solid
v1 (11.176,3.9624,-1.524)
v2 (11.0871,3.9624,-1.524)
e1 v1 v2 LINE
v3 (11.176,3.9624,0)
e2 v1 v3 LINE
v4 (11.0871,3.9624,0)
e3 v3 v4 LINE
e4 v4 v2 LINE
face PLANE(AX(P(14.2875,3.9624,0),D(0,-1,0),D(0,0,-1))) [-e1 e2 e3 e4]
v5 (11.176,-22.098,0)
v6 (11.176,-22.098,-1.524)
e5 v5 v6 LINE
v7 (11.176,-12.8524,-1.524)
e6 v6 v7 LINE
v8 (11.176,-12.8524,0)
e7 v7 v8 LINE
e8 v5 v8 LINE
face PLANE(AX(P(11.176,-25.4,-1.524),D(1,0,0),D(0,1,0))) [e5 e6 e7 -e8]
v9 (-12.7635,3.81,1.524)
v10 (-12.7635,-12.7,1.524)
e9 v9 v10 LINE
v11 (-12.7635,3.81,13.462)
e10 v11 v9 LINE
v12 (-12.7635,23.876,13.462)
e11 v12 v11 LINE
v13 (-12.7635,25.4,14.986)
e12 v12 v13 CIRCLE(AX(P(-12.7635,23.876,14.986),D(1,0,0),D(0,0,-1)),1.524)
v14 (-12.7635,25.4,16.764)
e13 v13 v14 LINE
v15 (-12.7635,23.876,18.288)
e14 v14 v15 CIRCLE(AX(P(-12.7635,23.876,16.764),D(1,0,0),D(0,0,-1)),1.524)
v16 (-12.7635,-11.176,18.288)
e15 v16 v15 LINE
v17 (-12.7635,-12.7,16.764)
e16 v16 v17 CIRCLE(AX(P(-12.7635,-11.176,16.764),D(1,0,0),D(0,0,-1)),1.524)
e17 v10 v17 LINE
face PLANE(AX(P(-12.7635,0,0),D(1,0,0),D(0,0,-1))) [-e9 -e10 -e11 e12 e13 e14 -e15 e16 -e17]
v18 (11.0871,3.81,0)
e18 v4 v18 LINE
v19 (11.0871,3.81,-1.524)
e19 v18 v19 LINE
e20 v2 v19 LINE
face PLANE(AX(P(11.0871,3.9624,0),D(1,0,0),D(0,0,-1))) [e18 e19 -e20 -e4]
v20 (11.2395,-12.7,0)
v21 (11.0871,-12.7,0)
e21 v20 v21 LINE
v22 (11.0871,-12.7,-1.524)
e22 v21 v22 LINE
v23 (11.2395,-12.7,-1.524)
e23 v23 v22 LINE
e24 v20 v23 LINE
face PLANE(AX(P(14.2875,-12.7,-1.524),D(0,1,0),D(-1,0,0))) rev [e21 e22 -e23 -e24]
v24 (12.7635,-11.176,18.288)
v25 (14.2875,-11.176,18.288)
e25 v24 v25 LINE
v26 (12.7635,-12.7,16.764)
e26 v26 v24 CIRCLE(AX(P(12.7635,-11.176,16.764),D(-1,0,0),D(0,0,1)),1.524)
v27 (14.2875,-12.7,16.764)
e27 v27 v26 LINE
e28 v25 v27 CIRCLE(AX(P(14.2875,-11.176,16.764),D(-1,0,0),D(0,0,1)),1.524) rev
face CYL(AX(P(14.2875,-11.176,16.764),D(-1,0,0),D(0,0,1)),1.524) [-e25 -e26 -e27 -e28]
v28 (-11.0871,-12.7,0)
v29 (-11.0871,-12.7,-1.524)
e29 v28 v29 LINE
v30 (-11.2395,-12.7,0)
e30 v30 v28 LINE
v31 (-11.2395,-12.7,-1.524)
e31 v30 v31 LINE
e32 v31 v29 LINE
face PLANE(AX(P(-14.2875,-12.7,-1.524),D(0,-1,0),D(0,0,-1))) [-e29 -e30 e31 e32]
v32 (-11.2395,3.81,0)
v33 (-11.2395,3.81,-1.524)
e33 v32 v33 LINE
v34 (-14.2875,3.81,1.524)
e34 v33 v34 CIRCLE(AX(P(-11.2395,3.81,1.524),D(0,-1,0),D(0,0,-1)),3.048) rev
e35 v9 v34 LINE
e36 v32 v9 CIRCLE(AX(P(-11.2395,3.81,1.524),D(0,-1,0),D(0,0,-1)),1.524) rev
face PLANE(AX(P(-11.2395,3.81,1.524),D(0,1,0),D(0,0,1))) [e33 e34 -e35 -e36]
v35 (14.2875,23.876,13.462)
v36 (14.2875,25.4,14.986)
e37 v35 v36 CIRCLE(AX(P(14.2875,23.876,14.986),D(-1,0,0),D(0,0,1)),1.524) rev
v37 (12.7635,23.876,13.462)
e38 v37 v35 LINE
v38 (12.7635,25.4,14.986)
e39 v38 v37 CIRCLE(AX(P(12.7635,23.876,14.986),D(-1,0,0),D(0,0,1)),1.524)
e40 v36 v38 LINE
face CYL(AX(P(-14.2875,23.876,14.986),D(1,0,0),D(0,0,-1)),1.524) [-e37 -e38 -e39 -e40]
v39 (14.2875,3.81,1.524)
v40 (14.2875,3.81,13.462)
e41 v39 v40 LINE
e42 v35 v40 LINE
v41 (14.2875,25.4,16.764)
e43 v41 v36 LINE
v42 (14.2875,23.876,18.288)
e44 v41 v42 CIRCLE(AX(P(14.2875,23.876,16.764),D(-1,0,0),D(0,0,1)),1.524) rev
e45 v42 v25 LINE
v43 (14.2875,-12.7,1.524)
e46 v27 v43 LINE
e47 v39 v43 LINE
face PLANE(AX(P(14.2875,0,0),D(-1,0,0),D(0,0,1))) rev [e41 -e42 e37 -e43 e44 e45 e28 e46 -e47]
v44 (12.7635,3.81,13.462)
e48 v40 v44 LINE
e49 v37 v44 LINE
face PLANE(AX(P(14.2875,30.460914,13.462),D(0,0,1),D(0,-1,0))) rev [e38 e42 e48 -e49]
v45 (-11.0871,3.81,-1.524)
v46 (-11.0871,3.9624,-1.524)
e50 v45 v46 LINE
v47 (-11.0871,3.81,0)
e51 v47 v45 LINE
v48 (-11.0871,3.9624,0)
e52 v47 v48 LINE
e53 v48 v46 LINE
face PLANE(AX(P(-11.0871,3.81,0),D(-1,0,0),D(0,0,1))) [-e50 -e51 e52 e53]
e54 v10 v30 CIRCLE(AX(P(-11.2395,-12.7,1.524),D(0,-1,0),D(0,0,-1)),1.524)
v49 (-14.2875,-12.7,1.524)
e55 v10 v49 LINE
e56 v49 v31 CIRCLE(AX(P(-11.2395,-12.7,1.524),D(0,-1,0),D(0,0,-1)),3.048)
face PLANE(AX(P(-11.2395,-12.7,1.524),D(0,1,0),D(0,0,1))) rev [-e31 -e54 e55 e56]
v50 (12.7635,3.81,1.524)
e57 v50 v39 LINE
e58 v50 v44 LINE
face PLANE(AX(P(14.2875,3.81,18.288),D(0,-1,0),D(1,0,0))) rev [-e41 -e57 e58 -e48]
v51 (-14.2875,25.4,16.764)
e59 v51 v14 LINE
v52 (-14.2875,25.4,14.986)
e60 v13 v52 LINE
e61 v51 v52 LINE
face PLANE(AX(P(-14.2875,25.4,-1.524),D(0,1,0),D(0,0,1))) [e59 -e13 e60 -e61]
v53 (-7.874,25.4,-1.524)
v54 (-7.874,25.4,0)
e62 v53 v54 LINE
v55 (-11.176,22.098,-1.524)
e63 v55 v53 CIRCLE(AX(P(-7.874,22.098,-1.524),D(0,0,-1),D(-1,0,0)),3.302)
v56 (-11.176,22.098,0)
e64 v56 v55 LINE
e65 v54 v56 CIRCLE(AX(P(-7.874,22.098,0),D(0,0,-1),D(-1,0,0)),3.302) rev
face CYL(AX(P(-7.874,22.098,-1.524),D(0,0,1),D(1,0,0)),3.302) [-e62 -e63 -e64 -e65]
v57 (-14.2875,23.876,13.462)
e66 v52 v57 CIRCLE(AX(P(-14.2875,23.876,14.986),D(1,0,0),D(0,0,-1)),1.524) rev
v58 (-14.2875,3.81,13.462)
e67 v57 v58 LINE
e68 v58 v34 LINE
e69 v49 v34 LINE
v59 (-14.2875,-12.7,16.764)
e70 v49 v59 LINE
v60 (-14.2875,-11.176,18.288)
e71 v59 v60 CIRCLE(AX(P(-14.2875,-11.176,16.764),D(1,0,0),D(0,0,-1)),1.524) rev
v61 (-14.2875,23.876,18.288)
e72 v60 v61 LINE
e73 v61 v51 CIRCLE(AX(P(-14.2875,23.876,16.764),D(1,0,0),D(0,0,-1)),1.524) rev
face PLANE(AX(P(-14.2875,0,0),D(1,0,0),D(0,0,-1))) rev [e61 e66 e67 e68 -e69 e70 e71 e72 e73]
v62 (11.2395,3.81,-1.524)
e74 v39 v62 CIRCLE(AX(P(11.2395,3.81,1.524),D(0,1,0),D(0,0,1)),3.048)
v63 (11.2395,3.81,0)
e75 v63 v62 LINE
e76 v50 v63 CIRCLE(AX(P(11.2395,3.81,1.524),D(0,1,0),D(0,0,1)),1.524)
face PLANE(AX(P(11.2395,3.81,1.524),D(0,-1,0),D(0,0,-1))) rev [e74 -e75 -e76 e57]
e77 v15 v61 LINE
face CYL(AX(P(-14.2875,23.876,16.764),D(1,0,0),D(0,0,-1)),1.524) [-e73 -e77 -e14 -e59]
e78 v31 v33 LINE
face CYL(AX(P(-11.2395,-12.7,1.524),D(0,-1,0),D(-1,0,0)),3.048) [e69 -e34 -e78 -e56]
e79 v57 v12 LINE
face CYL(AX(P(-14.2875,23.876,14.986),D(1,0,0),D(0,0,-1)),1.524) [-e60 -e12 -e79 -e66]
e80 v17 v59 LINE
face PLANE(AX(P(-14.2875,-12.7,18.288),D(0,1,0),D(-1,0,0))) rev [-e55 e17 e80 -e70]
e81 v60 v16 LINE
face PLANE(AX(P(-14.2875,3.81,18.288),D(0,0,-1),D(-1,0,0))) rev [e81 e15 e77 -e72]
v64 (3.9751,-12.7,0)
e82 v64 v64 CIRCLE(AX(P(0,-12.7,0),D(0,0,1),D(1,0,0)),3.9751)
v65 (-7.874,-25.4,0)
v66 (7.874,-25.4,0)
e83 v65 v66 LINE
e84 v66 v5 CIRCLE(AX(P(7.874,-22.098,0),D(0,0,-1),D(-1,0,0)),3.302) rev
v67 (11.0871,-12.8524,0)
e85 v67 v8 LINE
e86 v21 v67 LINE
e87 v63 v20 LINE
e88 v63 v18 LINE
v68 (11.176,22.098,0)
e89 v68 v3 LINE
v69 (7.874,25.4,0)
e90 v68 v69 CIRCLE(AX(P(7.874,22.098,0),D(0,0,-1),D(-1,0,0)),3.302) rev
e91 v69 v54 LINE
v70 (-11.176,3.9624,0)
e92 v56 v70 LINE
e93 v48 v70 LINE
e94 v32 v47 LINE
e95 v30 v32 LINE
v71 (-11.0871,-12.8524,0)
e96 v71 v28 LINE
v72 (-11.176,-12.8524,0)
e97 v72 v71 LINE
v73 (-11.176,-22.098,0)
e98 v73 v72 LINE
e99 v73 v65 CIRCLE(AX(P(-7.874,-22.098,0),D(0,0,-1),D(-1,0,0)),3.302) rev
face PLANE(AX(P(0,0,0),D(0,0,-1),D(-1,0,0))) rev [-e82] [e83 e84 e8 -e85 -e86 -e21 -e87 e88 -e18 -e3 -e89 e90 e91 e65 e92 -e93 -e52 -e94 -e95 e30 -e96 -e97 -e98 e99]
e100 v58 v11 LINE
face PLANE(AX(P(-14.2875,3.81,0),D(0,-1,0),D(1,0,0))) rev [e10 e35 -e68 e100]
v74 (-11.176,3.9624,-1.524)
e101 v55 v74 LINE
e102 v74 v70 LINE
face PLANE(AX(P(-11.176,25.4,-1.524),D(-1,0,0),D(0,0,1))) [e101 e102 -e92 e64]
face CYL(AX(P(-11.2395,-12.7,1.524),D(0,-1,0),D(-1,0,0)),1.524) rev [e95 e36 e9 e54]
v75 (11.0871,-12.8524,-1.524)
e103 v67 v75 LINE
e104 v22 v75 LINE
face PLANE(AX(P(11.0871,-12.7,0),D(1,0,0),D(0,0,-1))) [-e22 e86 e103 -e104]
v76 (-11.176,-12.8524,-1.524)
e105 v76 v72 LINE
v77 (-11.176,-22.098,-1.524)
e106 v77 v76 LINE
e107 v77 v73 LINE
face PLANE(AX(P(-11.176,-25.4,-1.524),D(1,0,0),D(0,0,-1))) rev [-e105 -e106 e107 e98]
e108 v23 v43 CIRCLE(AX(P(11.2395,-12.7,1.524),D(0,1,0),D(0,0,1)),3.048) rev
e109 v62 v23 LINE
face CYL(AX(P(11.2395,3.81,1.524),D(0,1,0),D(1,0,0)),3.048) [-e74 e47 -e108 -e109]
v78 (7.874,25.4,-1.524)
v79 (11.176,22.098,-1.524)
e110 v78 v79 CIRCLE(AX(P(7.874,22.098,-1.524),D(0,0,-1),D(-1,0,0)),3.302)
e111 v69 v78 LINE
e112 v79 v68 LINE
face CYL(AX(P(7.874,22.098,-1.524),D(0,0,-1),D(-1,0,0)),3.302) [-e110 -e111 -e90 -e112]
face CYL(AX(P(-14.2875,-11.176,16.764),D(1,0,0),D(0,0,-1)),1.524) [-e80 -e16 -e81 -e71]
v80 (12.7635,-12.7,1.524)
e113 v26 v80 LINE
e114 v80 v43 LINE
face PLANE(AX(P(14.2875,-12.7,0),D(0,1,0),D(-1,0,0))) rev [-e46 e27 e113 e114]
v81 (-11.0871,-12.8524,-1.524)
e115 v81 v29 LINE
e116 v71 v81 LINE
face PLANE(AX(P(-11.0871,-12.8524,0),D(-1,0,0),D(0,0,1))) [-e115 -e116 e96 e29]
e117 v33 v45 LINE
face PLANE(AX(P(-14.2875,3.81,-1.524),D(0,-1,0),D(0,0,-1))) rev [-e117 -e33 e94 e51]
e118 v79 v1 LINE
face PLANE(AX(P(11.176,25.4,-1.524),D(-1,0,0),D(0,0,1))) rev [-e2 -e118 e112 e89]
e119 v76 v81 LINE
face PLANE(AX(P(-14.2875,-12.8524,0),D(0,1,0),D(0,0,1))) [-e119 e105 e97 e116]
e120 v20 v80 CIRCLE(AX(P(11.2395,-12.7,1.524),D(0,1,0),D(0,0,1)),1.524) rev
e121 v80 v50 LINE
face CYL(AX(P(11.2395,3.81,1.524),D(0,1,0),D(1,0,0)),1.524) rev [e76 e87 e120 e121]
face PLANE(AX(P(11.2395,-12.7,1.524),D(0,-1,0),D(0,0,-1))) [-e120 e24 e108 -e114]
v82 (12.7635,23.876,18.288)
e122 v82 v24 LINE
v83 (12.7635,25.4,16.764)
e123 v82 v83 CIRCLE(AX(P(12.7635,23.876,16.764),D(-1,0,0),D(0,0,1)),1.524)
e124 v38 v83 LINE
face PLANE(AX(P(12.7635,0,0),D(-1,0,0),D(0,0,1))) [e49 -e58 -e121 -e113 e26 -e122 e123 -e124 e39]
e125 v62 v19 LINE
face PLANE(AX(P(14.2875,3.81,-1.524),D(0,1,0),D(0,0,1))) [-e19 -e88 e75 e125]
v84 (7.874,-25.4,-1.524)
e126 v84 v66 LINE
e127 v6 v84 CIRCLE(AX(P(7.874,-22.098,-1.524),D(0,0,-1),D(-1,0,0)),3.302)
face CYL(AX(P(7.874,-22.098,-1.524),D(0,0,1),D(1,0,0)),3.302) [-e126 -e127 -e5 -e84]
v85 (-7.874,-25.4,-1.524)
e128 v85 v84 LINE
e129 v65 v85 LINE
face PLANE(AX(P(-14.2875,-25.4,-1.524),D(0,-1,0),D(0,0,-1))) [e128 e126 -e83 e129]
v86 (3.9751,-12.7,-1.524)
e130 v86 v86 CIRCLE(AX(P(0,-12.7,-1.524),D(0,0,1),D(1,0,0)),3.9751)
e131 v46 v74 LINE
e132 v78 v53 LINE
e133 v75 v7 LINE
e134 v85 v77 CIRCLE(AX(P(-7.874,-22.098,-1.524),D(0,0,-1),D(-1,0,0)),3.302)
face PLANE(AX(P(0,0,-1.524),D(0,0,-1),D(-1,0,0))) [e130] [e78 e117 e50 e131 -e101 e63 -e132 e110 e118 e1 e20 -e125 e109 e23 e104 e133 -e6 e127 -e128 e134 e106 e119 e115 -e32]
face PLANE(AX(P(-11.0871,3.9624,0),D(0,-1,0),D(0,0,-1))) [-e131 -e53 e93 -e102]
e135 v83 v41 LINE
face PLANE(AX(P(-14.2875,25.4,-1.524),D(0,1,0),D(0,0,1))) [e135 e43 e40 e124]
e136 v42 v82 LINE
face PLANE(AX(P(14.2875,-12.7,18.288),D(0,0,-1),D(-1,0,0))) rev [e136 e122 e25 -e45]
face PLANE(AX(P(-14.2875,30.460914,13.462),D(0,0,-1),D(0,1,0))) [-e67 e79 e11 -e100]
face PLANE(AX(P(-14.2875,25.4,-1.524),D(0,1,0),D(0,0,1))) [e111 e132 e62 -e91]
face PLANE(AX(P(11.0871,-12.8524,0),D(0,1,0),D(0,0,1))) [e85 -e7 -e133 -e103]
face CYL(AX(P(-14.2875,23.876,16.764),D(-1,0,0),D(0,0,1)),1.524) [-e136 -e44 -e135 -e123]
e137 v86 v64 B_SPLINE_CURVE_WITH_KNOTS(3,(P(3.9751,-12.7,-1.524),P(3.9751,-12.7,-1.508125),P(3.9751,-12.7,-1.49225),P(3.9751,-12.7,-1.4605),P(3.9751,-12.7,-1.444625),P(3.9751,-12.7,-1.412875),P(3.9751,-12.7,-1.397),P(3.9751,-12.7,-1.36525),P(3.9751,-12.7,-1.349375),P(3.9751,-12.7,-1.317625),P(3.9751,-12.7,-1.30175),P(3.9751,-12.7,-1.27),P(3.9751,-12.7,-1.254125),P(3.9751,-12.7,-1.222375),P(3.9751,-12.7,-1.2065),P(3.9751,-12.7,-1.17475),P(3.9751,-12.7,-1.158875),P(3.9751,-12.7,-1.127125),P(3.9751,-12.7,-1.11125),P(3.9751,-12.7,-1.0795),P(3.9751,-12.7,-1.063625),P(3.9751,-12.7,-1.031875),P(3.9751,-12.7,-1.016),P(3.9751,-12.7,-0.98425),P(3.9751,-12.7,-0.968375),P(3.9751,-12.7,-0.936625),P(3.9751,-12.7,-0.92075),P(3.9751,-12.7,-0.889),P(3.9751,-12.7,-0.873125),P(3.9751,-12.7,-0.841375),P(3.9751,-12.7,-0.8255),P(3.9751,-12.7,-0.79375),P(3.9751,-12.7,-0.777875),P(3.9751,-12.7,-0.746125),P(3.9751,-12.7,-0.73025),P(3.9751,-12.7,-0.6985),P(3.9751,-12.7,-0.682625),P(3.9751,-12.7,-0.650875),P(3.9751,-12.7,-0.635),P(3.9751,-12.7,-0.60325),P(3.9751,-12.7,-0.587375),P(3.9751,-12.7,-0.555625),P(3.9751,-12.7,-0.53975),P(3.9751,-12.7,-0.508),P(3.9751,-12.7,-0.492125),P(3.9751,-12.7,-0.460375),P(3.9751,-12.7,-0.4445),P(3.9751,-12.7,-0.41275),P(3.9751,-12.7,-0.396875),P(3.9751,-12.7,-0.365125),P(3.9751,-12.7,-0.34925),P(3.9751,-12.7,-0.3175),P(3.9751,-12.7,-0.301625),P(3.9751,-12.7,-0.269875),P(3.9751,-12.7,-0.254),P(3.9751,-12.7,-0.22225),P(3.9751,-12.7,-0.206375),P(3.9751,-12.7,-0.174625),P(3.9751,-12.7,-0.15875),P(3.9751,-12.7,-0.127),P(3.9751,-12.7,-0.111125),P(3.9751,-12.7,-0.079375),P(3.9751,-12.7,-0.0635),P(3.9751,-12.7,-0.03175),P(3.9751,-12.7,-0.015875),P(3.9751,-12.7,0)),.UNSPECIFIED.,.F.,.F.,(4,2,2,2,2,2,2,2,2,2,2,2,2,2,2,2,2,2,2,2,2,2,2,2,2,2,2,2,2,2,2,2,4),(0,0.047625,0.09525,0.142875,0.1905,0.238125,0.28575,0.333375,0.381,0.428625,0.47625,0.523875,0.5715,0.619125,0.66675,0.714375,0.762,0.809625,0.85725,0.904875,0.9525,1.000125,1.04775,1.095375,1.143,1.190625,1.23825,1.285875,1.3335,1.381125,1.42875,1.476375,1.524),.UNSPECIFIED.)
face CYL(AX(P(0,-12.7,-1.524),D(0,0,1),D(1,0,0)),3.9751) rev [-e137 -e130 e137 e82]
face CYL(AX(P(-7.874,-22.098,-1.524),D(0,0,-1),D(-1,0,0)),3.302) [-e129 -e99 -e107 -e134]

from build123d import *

# Parameters (mm, degrees)
CROQUIS1_W               = 28.575
CROQUIS1_H               = 50.8
BRIDA_BASE1_DEPTH        = 1.524
CROQUIS6_R               = 3.9751
CROQUIS6_W               = 3.1115
CROQUIS6_H               = 21.59
CROQUIS6_H_2             = 12.7
CORTAR_EXTRUIR1_DEPTH    = 30.182447331
BRIDA_START              = -12.7
BRIDA_DE_ARISTA1_DEPTH   = 16.51
BRIDA_START_2            = -12.8524
BRIDA_DE_ARISTA1_2_DEPTH = 0.1524
BRIDA_START_3            = 3.81
BRIDA_DE_ARISTA1_3_DEPTH = 0.1524
BRIDA_DE_ARISTA1_4_DEPTH = 16.51
CROQUIS13_W              = 1.524
CROQUIS13_H              = 4.826
SALIENTE_EXTRUIR1_DEPTH  = 21.59
REDONDEO1_R              = 3.302
REDONDEO2_R              = 1.524


# Read off the part's stored shape, not the designer's step: Brida de arista1
# Sheet-metal steps are written as plain solids
with BuildPart() as part:
    # Croquis1 → Brida base1 (new body)
    with BuildSketch(Plane.XY):
        Rectangle(CROQUIS1_W, CROQUIS1_H)
    extrude(amount=-BRIDA_BASE1_DEPTH)

    # Croquis6 → Cortar-Extruir1 (cut, through all)
    with BuildSketch(Plane.XY):
        with Locations((0, -12.7)):
            Circle(CROQUIS6_R)
        with Locations((-12.73175, 14.605)):
            Rectangle(CROQUIS6_W, CROQUIS6_H)
        with Locations((12.73175, 14.605)):
            Rectangle(CROQUIS6_W, CROQUIS6_H)
        with Locations((-12.73175, -19.05)):
            Rectangle(CROQUIS6_W, CROQUIS6_H_2)
        with Locations((12.73175, -19.05)):
            Rectangle(CROQUIS6_W, CROQUIS6_H_2)
    extrude(amount=-CORTAR_EXTRUIR1_DEPTH, mode=Mode.SUBTRACT)

    # Brida de arista1 outline → Brida de arista1 (cut)
    with BuildSketch(Plane(origin=(0, 0, 0), x_dir=(1, 0, 0), z_dir=(0, 1, 0)).offset(BRIDA_START)):
        with BuildLine():
            Line((14.2875, 1.524), (11.2395, 1.524))
            ThreePointArc((11.2395, 1.524), (12.7635, 1.115645431), (13.879145431, 0))
            Line((13.879145431, 0), (14.2875, 0))
            Line((14.2875, 0), (14.2875, 1.524))
        make_face()
        with BuildLine():
            ThreePointArc((-13.879145431, 0), (-12.7635, 1.115645431), (-11.2395, 1.524))
            Line((-11.2395, 1.524), (-14.2875, 1.524))
            Line((-14.2875, 1.524), (-14.2875, 0))
            Line((-14.2875, 0), (-13.879145431, 0))
        make_face()
    extrude(amount=BRIDA_DE_ARISTA1_DEPTH, mode=Mode.SUBTRACT)

    # Brida de arista1 2 outline → Brida de arista1 2 (cut)
    with BuildSketch(Plane(origin=(0, 0, 0), x_dir=(1, 0, 0), z_dir=(0, 1, 0)).offset(BRIDA_START_2)):
        with BuildLine():
            Line((11.0871, 1.524), (11.0871, 0))
            Line((11.0871, 0), (13.879145431, 0))
            ThreePointArc((13.879145431, 0), (12.7635, 1.115645431), (11.2395, 1.524))
            Line((11.2395, 1.524), (11.0871, 1.524))
        make_face()
        with BuildLine():
            Line((-13.879145431, 0), (-11.0871, 0))
            Line((-11.0871, 0), (-11.0871, 1.524))
            Line((-11.0871, 1.524), (-11.2395, 1.524))
            ThreePointArc((-11.2395, 1.524), (-12.7635, 1.115645431), (-13.879145431, 0))
        make_face()
    extrude(amount=BRIDA_DE_ARISTA1_2_DEPTH, mode=Mode.SUBTRACT)

    # Brida de arista1 3 outline → Brida de arista1 3 (cut)
    with BuildSketch(Plane(origin=(0, 0, 0), x_dir=(1, 0, 0), z_dir=(0, 1, 0)).offset(BRIDA_START_3)):
        with BuildLine():
            Line((11.0871, 1.524), (11.0871, 0))
            Line((11.0871, 0), (13.879145431, 0))
            ThreePointArc((13.879145431, 0), (12.7635, 1.115645431), (11.2395, 1.524))
            Line((11.2395, 1.524), (11.0871, 1.524))
        make_face()
        with BuildLine():
            Line((-13.879145431, 0), (-11.0871, 0))
            Line((-11.0871, 0), (-11.0871, 1.524))
            Line((-11.0871, 1.524), (-11.2395, 1.524))
            ThreePointArc((-11.2395, 1.524), (-12.7635, 1.115645431), (-13.879145431, 0))
        make_face()
    extrude(amount=BRIDA_DE_ARISTA1_3_DEPTH, mode=Mode.SUBTRACT)

    # Brida de arista1 4 outline → Brida de arista1 4 (add)
    with BuildSketch(Plane(origin=(0, 0, 0), x_dir=(1, 0, 0), z_dir=(0, 1, 0)).offset(BRIDA_START)):
        with BuildLine():
            Line((13.879145431, 0), (11.2395, 0))
            ThreePointArc((11.2395, 0), (12.317130735, -0.446369265), (12.7635, -1.524))
            Line((12.7635, -1.524), (12.7635, -18.288))
            Line((12.7635, -18.288), (14.2875, -18.288))
            Line((14.2875, -18.288), (14.2875, -1.524))
            ThreePointArc((14.2875, -1.524), (14.183641918, -0.735119551), (13.879145431, 0))
        make_face()
        with BuildLine():
            ThreePointArc((-12.7635, -1.524), (-12.317130735, -0.446369265), (-11.2395, 0))
            Line((-11.2395, 0), (-13.879145431, 0))
            ThreePointArc((-13.879145431, 0), (-14.183641918, -0.735119551), (-14.2875, -1.524))
            Line((-14.2875, -1.524), (-14.2875, -18.288))
            Line((-14.2875, -18.288), (-12.7635, -18.288))
            Line((-12.7635, -18.288), (-12.7635, -1.524))
        make_face()
    extrude(amount=BRIDA_DE_ARISTA1_4_DEPTH)

    # Croquis13 → Saliente-Extruir1 (add)
    with BuildSketch(Plane(origin=(0, 3.81, 0), x_dir=(1, 0, 0), z_dir=(0, 1, 0))):
        with Locations((13.5255, -15.875)):
            Rectangle(CROQUIS13_W, CROQUIS13_H)
    saliente_extruir1 = extrude(amount=SALIENTE_EXTRUIR1_DEPTH)

    # Simetría1: Saliente-Extruir1 across plane
    add(saliente_extruir1.mirror(Plane(origin=(0, 0, 0), x_dir=(0, 0, 1), z_dir=(1, 0, 0))))

    # Redondeo1
    redondeo1_edges = [part.edges().sort_by_distance(p)[0] for p in [
        (11.176, 25.4, -0.762),
        (-11.176, -25.4, -0.762),
        (11.176, -25.4, -0.762),
        (-11.176, 25.4, -0.762),
    ]]
    fillet(redondeo1_edges, radius=REDONDEO1_R)

    # Redondeo2
    redondeo2_edges = [part.edges().sort_by_distance(p)[0] for p in [
        (13.5255, -12.7, 18.288),
        (-13.5255, -12.7, 18.288),
        (13.5255, 25.4, 18.288),
        (13.5255, 25.4, 13.462),
        (-13.5255, 25.4, 13.462),
        (-13.5255, 25.4, 18.288),
    ]]
    fillet(redondeo2_edges, radius=REDONDEO2_R)


solid = part.part
